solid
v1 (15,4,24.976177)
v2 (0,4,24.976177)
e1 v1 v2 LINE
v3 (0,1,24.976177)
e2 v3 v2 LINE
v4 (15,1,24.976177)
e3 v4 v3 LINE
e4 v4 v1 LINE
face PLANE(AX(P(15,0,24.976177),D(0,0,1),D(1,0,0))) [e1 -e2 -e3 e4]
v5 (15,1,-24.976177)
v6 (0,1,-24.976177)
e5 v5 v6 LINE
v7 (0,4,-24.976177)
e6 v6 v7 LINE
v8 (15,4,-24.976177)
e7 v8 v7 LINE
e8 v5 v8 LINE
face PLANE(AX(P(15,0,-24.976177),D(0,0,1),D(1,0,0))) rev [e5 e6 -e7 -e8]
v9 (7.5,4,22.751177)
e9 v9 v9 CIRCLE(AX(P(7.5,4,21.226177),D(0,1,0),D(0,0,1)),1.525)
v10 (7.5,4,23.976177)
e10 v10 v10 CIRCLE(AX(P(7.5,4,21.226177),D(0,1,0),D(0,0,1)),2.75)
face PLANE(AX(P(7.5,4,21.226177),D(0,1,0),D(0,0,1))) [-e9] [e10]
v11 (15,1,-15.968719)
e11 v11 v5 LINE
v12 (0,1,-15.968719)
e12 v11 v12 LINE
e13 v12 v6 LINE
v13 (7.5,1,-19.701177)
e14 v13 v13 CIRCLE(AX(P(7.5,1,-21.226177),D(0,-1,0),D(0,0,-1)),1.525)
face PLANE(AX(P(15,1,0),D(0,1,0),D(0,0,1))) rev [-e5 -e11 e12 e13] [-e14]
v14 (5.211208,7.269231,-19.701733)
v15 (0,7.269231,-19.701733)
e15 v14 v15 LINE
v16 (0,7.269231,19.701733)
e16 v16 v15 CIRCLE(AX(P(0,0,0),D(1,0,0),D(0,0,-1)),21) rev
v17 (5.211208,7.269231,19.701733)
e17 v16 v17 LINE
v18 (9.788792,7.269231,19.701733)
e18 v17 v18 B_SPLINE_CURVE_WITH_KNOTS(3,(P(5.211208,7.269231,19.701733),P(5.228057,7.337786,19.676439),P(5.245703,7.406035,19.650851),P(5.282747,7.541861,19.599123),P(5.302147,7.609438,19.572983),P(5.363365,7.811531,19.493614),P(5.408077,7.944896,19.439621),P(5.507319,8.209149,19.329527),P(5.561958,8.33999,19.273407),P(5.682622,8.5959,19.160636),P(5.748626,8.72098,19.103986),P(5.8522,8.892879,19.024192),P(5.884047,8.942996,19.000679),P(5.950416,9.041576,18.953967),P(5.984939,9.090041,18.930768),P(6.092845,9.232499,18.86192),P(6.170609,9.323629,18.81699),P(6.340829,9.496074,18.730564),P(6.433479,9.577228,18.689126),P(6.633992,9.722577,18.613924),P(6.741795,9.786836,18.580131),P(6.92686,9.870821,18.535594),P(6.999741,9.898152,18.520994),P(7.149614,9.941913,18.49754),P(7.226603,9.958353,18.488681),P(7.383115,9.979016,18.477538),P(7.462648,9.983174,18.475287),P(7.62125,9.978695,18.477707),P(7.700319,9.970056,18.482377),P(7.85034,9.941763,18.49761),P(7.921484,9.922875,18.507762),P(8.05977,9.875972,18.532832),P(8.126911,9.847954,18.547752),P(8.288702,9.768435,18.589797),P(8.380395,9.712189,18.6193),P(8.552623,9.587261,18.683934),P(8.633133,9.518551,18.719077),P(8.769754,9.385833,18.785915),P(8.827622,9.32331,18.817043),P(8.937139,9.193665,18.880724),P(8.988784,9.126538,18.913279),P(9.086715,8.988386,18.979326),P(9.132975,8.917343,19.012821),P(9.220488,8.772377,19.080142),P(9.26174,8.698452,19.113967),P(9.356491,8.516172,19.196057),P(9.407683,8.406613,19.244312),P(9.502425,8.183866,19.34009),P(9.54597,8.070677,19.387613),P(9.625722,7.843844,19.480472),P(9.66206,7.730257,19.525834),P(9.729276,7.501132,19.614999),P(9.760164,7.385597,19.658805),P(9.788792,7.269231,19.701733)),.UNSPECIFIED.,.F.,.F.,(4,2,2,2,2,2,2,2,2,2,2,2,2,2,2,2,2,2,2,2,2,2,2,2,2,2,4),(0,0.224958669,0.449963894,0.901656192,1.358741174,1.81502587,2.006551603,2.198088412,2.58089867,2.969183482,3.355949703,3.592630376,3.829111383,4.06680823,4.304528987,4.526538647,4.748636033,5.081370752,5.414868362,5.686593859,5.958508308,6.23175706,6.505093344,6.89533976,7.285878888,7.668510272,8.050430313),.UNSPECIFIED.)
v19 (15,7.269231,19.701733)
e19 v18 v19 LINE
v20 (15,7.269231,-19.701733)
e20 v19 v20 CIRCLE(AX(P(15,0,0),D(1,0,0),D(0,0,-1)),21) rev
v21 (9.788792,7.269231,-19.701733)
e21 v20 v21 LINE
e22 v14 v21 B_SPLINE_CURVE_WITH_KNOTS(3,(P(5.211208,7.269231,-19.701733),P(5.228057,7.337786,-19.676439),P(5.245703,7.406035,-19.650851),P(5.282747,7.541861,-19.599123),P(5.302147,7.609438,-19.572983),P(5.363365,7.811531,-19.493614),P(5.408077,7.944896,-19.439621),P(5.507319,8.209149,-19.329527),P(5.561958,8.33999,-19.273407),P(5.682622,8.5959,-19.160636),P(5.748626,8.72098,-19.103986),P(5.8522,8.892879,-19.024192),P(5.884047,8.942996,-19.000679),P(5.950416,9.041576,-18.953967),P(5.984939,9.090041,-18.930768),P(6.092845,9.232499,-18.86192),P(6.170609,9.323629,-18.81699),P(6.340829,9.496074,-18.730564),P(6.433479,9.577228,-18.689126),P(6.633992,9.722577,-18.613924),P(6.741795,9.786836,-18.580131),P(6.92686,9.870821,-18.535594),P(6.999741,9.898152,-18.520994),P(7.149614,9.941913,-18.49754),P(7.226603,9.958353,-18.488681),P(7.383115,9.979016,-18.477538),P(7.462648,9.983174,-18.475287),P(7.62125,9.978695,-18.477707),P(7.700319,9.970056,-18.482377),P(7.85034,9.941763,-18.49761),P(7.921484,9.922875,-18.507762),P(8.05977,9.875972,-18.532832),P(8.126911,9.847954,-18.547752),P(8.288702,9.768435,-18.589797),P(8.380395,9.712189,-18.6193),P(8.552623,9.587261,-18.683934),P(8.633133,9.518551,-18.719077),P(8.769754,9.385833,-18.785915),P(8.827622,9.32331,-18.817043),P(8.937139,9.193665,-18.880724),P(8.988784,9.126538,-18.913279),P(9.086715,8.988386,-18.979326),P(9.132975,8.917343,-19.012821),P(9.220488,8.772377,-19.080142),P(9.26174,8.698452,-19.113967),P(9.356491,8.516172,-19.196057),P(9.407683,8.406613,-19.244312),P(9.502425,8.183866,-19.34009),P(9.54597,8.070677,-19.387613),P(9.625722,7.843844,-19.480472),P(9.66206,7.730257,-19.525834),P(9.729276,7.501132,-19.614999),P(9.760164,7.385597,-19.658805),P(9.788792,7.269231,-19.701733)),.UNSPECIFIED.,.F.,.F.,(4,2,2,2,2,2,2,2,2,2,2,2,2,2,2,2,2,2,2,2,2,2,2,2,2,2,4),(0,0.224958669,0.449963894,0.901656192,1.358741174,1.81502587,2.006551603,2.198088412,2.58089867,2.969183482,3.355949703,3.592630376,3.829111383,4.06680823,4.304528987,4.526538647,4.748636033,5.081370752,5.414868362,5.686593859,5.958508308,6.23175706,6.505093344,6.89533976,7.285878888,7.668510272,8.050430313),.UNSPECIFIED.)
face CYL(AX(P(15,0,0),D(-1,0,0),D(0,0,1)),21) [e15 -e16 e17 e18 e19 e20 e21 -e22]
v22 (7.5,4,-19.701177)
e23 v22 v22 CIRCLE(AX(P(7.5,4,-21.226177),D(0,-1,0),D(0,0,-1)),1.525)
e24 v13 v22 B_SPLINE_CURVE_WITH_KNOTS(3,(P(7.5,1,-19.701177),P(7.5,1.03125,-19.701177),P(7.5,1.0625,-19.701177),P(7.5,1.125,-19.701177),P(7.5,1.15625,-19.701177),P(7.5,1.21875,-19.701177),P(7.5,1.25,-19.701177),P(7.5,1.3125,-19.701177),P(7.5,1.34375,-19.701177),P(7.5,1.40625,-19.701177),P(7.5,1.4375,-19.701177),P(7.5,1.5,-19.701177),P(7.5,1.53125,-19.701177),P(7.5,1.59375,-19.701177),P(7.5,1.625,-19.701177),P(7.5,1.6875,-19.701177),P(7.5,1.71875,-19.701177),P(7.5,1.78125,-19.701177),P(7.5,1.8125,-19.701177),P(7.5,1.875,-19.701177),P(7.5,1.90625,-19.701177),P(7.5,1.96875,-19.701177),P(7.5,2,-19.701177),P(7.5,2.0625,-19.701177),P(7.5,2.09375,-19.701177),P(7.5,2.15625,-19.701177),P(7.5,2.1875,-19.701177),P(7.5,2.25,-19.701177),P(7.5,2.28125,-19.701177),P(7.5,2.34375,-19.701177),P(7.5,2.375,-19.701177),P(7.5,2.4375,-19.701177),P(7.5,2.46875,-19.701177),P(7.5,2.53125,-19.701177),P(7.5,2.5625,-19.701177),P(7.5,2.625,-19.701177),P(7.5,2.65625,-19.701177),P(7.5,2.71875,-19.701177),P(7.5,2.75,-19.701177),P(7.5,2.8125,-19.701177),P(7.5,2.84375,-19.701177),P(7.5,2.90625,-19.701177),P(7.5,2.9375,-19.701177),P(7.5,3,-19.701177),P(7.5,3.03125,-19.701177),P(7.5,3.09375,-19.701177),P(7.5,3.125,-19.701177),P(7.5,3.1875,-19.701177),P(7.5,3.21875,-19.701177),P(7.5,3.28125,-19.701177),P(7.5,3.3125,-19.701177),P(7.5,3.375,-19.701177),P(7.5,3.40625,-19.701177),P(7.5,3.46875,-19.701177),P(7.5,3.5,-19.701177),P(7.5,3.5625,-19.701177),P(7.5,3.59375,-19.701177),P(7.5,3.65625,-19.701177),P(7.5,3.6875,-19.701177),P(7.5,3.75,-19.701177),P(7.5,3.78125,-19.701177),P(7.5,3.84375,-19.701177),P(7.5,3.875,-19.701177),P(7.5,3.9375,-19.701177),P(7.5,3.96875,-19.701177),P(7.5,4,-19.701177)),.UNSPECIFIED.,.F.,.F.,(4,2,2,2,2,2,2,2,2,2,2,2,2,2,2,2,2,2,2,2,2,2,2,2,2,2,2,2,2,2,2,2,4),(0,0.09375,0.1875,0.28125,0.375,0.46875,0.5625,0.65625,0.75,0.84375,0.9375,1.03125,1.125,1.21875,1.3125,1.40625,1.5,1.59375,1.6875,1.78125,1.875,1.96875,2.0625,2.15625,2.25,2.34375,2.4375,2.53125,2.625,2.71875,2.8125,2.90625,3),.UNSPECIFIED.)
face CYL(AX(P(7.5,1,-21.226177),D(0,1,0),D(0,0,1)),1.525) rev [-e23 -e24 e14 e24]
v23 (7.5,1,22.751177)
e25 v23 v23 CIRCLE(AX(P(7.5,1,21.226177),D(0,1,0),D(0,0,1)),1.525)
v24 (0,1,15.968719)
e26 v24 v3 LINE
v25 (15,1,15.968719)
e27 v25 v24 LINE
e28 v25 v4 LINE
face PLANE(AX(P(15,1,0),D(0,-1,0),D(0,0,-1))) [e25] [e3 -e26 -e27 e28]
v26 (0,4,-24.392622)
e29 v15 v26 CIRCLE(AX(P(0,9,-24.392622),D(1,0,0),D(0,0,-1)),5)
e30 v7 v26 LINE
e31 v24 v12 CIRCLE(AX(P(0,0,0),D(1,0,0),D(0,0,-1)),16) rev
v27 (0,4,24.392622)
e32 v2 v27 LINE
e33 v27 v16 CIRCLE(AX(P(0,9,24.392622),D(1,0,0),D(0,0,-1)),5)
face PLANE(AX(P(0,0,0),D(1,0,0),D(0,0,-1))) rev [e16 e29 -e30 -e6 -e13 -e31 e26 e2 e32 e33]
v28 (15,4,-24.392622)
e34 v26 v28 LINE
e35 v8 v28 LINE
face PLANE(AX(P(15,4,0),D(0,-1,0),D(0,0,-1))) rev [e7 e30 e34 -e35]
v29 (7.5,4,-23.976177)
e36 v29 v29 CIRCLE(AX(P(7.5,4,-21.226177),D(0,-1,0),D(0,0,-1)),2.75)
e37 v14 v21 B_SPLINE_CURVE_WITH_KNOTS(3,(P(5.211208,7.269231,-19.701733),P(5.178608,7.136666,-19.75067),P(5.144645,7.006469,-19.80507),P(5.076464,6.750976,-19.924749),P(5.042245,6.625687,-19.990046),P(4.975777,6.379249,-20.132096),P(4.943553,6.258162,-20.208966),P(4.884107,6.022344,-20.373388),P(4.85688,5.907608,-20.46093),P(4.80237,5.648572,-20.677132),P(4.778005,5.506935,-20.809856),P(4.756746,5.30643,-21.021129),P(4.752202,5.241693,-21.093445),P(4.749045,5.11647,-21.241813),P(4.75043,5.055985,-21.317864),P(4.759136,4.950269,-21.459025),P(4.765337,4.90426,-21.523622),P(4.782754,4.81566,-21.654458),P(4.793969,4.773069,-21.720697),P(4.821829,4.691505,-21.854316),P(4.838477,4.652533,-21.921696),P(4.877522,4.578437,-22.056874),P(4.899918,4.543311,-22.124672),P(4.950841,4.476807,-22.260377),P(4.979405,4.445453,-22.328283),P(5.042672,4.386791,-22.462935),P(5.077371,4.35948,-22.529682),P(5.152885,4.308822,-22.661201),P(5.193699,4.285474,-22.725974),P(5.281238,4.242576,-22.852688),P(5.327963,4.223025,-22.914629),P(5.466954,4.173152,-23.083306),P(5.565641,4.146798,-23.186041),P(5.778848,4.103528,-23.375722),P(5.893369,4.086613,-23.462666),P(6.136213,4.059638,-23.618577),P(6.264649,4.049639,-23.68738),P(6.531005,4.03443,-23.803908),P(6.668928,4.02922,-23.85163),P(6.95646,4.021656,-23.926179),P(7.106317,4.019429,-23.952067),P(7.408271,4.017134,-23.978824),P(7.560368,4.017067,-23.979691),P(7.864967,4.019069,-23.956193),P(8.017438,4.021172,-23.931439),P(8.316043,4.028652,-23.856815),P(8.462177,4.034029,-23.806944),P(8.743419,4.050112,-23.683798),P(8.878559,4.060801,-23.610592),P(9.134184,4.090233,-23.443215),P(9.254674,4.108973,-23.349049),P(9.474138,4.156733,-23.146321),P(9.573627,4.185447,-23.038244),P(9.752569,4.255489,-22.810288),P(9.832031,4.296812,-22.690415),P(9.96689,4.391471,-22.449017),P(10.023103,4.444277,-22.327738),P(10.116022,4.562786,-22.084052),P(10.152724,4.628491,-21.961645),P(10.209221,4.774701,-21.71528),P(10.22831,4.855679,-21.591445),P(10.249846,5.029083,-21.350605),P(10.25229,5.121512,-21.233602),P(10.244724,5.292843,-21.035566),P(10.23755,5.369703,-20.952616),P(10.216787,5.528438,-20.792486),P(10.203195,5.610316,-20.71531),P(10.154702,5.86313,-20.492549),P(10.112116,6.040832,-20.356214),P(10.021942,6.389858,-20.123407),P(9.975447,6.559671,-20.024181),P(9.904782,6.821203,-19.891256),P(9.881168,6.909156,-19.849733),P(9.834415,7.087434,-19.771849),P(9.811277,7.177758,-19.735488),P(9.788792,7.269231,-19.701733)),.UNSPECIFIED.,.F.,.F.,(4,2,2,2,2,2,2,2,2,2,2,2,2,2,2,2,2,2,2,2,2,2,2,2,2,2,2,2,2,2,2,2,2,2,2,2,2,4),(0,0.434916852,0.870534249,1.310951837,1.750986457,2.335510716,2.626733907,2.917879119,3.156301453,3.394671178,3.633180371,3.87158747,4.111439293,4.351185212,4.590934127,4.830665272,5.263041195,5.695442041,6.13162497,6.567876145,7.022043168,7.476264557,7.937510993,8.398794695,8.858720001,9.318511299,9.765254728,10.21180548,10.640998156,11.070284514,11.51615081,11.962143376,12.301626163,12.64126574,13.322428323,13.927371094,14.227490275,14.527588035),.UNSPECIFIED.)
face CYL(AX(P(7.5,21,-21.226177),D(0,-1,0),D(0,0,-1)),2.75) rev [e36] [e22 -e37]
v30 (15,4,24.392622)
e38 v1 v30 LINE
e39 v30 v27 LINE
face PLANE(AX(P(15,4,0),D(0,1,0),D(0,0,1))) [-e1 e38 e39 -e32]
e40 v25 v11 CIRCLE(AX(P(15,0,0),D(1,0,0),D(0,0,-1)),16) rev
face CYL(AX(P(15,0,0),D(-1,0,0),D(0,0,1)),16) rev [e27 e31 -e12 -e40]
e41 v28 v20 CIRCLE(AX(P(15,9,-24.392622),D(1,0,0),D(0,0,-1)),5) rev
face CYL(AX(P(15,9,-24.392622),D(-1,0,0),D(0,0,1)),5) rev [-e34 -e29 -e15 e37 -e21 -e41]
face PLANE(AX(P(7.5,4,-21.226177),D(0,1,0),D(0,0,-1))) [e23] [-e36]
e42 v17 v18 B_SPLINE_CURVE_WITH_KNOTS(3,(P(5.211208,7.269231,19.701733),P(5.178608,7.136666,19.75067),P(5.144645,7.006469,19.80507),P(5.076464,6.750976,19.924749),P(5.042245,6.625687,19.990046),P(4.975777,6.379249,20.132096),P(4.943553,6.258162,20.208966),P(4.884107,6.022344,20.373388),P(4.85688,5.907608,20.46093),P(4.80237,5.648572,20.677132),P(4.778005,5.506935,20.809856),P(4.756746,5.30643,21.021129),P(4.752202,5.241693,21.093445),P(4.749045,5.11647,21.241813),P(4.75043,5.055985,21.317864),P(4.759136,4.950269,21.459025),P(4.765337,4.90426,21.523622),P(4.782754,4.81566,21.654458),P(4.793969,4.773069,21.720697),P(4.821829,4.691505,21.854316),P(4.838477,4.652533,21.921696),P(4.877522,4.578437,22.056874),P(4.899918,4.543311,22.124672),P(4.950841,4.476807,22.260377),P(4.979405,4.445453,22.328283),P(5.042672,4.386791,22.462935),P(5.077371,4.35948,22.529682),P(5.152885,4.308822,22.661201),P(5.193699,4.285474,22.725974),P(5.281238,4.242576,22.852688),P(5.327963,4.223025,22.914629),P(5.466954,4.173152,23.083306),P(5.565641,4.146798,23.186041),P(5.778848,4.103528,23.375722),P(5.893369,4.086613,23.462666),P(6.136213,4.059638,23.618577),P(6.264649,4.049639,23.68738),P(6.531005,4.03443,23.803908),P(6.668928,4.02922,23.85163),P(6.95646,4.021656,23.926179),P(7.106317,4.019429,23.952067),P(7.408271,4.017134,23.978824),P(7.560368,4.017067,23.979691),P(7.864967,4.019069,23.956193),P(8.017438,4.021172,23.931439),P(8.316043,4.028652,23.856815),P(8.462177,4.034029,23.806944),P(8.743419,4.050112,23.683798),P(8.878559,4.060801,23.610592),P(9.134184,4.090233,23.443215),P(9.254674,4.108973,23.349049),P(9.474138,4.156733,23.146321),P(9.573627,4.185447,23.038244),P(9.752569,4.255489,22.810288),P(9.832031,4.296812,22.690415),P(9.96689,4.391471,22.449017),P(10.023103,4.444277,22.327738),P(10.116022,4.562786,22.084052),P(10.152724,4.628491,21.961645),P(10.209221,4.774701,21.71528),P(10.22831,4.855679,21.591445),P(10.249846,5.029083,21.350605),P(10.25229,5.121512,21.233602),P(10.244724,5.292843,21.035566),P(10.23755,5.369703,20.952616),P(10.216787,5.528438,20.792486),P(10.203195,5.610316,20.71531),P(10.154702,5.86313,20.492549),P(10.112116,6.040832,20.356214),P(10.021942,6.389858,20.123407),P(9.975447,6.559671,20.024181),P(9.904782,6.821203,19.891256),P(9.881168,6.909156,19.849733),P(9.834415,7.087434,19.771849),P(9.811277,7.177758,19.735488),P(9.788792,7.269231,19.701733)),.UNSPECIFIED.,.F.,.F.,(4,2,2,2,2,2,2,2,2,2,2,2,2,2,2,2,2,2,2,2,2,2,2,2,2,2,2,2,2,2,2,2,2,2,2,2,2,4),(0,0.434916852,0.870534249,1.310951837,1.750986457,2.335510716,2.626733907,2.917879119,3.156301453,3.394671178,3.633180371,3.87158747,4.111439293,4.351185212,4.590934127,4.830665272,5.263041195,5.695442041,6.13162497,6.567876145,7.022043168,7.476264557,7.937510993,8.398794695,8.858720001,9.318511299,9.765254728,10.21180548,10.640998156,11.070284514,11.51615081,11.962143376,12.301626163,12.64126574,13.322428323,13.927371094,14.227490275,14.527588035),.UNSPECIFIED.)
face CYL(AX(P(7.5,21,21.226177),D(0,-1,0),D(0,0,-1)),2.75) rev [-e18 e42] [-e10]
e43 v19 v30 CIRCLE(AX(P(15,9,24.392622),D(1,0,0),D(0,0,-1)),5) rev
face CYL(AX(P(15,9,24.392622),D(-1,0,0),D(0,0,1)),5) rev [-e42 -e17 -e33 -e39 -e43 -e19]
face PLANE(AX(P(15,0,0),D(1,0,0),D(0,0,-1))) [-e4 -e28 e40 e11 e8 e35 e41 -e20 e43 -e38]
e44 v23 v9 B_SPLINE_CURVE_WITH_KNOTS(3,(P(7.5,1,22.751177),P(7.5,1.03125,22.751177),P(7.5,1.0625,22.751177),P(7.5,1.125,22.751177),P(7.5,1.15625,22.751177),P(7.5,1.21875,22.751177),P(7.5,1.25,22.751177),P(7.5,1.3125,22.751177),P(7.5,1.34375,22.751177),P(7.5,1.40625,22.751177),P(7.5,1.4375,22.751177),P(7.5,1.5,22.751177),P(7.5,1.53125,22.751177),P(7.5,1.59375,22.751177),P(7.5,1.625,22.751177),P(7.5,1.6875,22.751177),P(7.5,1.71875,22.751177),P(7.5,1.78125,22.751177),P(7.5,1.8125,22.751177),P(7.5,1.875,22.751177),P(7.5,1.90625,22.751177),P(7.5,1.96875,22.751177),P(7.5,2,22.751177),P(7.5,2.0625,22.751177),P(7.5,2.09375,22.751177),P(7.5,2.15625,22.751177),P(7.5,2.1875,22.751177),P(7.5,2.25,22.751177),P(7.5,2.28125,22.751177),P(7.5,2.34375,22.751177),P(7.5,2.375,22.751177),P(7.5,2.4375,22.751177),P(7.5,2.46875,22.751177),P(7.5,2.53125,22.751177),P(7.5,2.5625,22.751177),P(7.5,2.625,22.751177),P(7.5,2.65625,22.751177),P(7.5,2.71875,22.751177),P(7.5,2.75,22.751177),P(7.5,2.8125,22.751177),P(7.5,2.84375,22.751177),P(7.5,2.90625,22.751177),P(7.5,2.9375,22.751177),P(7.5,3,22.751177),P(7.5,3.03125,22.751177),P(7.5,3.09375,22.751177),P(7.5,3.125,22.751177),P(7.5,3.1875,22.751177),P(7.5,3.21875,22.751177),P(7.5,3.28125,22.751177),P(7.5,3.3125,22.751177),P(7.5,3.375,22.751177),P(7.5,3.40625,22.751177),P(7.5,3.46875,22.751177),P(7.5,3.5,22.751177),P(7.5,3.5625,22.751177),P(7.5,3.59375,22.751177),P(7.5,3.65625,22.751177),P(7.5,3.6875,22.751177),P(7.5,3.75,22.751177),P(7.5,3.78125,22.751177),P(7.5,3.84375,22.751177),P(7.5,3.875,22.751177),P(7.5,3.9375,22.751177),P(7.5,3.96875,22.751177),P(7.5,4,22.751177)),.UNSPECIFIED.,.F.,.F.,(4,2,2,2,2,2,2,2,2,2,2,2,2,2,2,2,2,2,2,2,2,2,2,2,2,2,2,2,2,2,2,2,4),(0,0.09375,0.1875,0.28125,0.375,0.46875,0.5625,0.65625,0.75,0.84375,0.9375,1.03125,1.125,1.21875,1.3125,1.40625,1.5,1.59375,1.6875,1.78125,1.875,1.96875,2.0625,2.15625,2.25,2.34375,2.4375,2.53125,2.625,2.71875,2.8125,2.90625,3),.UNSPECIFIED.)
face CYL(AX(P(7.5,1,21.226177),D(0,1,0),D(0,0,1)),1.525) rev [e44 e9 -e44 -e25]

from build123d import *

# Parameters (mm, degrees)
BOSS_EXTRUDE1_DEPTH = 15
FILLET1_R           = 5
SKETCH2_R           = 2.75
CUT_EXTRUDE1_DEPTH  = 34.73143068
CUT_EXTRUDE2_DEPTH  = 34.731430775


# Read off the part's stored shape, not the designer's step: Mirror1
with BuildPart() as part:
    # Sketch1 → Boss-Extrude1 (new body)
    with BuildSketch(Plane(origin=(0, 0, 0), x_dir=(0, 0, -1), z_dir=(1, 0, 0))):
        with BuildLine():
            ThreePointArc((-20.976176963, 1), (-14.491376746, 15.198684154), (0, 21))
            Line((0, 21), (0, 16))
            ThreePointArc((0, 16), (-10.95445115, 11.66190379), (-15.968719423, 1))
            Line((-15.968719423, 1), (-20.976176963, 1))
        make_face()
        with BuildLine():
            Line((-24.976176963, 1), (-20.976176963, 1))
            ThreePointArc((-20.976176963, 1), (-20.84987969, 2.506494942), (-20.615528128, 4))
            Line((-20.615528128, 4), (-24.976176963, 4))
            Line((-24.976176963, 4), (-24.976176963, 1))
        make_face()
    extrude(amount=BOSS_EXTRUDE1_DEPTH)

    # Fillet1
    fillet1_edges = [part.edges().sort_by_distance(p)[0] for p in [
        (7.5, 4, 20.615528128),
    ]]
    fillet(fillet1_edges, radius=FILLET1_R)

    # Sketch2 → Cut-Extrude1 (cut, through all)
    with BuildSketch(Plane(origin=(0, 4, 0), x_dir=(1, 0, 0), z_dir=(0, 1, 0))):
        with Locations(Location((7.5, -21.226176963, 0), (0, 0, 146.334508492))):
            Circle(SKETCH2_R)
    extrude(amount=CUT_EXTRUDE1_DEPTH, mode=Mode.SUBTRACT)

    # Sketch2<3> → Cut-Extrude2 (cut, through all)
    with BuildSketch(Plane(origin=(0, 4, 0), x_dir=(1, 0, 0), z_dir=(0, 1, 0))):
        with BuildLine():
            ThreePointArc((5.975, -21.226176963), (7.5, -22.751176963), (9.025, -21.226176963))
            Line((9.025, -21.226176963), (5.975, -21.226176963))
        make_face()
        with BuildLine():
            Line((5.975, -21.226176963), (9.025, -21.226176963))
            ThreePointArc((9.025, -21.226176963), (7.5, -19.701176963), (5.975, -21.226176963))
        make_face()
    extrude(amount=-CUT_EXTRUDE2_DEPTH, mode=Mode.SUBTRACT)

    # Mirror1: part across plane


with BuildPart() as part_1:
    add(part.part)
    add(part.part.mirror(Plane.XY))


solid = part_1.part
